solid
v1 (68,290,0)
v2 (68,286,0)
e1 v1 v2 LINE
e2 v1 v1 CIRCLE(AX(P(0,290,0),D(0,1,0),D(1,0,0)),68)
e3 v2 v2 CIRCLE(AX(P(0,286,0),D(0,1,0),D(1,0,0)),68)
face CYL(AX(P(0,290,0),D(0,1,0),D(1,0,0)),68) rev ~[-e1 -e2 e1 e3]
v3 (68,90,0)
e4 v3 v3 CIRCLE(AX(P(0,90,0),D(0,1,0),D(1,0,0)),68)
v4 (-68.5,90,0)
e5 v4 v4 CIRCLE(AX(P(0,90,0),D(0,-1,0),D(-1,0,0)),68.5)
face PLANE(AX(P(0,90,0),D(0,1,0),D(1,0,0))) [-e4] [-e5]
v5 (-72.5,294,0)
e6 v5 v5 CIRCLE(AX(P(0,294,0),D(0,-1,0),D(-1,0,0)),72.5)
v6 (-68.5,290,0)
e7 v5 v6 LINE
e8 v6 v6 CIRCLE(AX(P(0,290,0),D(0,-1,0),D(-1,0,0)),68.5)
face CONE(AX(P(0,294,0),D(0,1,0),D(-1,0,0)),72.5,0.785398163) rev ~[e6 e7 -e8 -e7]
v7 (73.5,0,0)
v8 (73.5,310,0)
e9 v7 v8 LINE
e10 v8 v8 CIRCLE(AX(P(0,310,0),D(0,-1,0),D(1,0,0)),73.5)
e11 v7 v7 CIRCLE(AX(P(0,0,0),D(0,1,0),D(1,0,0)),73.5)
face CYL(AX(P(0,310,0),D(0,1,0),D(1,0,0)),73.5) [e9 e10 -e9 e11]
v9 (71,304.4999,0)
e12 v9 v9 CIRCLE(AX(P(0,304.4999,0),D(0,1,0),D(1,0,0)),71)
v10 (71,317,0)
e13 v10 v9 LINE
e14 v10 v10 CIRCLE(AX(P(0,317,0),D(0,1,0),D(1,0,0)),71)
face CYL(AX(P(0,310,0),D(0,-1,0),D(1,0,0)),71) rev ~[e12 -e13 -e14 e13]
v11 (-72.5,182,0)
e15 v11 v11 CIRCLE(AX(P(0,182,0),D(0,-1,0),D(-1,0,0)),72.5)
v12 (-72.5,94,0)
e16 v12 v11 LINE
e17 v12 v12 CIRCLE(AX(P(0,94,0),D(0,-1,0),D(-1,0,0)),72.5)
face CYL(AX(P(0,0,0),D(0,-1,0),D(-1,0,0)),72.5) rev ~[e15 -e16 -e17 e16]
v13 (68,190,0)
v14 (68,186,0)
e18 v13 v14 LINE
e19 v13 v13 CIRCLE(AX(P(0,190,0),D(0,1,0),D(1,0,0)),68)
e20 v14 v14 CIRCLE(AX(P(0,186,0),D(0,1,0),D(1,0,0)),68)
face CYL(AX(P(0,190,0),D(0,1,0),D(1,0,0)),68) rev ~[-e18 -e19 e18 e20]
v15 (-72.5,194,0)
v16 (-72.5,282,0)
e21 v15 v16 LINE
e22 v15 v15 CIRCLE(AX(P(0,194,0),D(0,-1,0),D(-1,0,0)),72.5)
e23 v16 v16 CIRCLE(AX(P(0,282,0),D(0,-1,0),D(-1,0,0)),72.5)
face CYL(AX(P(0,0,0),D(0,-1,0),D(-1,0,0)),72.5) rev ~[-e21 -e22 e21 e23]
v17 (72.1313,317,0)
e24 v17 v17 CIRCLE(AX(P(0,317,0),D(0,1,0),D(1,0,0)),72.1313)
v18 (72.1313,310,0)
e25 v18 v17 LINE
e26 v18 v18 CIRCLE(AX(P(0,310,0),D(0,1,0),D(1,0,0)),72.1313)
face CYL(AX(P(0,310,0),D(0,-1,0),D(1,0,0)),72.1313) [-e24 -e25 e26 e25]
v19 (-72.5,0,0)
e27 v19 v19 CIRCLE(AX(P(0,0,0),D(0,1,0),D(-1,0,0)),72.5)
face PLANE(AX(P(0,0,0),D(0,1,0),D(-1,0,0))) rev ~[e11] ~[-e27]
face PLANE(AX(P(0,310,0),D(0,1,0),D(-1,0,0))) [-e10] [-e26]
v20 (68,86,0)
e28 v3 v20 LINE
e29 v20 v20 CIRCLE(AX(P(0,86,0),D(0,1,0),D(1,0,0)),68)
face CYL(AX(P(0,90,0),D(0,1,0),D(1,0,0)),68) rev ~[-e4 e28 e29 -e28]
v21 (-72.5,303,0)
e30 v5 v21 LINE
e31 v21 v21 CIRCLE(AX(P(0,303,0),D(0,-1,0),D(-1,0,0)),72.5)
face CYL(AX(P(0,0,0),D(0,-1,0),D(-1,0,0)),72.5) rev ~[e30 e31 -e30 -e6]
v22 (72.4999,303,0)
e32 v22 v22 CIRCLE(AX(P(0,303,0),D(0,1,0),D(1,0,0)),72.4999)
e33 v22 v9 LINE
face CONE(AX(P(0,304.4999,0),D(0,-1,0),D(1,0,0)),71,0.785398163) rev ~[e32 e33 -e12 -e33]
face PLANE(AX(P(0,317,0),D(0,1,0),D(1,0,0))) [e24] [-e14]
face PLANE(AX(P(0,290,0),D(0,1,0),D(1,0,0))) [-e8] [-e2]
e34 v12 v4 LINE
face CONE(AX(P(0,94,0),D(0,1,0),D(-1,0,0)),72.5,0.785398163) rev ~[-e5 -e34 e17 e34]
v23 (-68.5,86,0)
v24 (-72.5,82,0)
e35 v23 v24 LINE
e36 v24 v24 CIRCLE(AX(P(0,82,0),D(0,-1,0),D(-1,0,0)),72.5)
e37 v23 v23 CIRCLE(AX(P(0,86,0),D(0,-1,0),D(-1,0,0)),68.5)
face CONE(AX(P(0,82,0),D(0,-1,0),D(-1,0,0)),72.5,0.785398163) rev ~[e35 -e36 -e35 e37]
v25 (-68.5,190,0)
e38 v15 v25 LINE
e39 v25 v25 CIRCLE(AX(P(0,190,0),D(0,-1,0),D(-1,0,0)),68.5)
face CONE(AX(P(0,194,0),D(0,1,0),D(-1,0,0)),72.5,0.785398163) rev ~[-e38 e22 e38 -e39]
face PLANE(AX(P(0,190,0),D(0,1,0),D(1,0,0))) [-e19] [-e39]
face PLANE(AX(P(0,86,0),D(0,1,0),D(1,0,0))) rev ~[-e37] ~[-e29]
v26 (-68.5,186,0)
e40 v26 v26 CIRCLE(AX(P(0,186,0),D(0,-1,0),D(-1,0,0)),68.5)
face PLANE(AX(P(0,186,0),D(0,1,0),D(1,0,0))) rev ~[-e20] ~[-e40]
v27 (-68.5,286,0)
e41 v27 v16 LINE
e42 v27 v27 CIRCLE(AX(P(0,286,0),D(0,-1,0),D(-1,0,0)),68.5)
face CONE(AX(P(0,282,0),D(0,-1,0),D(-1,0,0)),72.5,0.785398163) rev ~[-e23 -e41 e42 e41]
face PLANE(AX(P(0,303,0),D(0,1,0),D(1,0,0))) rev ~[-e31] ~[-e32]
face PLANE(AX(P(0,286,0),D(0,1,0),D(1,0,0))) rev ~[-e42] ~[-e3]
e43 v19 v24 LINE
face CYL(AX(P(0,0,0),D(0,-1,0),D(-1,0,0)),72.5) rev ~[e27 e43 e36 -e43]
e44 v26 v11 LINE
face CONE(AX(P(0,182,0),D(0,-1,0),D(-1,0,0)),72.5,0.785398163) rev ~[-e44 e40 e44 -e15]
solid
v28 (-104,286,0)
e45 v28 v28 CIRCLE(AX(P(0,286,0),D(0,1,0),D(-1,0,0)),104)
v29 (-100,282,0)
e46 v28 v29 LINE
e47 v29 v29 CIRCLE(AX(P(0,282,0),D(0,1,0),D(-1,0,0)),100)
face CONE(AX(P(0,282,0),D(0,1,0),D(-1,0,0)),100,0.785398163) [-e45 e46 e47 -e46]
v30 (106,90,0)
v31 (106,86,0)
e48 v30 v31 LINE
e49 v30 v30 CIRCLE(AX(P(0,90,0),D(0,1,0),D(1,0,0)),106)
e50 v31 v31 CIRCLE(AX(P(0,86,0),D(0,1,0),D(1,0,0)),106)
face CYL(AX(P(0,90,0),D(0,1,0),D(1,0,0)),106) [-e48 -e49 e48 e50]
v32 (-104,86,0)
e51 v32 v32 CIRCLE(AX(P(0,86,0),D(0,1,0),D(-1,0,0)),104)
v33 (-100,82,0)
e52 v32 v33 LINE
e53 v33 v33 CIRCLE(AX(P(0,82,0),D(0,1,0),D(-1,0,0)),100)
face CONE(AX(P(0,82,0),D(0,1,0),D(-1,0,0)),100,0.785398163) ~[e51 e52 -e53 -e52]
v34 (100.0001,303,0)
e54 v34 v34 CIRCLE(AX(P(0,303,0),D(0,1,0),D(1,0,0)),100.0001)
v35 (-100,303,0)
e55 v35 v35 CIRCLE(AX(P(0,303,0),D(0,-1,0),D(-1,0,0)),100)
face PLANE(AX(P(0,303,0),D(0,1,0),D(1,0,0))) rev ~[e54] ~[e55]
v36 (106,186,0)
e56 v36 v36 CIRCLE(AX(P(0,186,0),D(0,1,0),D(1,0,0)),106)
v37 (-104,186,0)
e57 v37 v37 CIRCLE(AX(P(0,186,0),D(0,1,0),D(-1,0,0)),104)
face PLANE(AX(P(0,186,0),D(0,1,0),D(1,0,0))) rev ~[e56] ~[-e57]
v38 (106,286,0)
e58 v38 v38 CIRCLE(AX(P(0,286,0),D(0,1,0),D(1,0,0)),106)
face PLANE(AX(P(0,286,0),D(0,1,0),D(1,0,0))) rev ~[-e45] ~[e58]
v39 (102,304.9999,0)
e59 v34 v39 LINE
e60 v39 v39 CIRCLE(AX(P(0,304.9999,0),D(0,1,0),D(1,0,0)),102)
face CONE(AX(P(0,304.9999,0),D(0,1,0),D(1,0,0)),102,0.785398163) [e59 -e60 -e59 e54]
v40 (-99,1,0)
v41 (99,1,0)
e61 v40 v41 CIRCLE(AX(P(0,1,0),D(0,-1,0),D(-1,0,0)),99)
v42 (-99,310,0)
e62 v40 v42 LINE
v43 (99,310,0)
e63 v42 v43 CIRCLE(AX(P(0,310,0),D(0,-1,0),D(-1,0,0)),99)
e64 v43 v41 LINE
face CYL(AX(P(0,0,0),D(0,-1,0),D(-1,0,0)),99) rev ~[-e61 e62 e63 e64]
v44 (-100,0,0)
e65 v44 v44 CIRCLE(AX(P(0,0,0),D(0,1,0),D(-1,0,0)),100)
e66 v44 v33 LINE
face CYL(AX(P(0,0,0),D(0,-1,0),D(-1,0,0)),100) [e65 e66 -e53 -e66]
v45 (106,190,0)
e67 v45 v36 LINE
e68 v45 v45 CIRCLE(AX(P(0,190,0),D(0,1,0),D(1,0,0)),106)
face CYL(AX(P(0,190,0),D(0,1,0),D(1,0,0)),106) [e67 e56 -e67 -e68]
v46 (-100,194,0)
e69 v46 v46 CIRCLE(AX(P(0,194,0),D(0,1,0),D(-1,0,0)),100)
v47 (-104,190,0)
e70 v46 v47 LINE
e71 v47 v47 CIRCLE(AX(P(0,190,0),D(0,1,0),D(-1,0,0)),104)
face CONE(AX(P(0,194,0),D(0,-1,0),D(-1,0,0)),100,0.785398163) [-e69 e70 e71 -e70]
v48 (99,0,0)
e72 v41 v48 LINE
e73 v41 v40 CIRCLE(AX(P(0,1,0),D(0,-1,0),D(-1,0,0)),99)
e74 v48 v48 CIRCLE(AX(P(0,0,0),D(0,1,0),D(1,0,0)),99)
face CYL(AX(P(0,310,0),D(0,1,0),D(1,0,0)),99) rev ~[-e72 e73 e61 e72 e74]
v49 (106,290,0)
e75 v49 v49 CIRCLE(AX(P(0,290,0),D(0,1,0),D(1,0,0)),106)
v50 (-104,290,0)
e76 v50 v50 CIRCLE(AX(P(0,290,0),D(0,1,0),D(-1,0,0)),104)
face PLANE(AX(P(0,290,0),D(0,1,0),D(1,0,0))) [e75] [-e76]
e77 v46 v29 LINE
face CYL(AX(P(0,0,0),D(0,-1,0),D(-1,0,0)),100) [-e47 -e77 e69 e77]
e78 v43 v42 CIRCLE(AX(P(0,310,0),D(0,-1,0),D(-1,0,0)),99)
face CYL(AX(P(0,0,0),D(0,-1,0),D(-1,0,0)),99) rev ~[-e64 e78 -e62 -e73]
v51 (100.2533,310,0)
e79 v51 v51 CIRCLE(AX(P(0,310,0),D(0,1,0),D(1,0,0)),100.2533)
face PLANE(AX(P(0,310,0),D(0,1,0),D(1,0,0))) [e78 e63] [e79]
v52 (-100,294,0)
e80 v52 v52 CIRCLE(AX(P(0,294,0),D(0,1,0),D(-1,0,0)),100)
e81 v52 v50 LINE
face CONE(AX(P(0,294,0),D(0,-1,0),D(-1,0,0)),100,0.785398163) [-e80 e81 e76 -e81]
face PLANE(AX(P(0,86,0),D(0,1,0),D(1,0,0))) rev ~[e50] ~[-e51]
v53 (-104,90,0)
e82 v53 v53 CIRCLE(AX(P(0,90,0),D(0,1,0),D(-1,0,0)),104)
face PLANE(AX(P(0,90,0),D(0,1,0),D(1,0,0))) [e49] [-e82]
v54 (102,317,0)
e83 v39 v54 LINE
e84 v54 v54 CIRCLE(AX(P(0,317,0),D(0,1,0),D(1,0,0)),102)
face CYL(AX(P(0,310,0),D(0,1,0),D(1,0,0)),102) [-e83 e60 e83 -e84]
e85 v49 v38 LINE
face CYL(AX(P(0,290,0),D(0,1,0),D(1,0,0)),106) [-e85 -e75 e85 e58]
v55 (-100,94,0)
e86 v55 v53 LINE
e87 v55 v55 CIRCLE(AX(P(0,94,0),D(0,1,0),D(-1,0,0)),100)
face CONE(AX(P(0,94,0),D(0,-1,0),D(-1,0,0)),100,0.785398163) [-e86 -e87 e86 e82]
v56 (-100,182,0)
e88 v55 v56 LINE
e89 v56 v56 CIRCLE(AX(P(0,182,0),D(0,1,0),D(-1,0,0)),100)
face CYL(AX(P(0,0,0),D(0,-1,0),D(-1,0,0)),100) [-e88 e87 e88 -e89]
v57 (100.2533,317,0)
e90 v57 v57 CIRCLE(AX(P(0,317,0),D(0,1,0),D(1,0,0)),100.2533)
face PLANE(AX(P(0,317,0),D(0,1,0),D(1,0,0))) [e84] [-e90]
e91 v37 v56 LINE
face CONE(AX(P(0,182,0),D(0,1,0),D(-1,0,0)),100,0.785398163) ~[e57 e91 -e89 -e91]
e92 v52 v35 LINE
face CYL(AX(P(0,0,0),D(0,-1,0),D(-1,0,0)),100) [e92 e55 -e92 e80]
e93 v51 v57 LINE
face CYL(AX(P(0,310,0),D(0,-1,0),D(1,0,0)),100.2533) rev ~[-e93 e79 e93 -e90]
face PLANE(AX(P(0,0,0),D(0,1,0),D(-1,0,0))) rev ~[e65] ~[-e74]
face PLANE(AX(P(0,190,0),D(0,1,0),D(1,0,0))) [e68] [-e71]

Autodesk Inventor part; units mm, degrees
ref_plane "YZ Plane" through (0, 0, 0) normal (1, 0, 0) x (0, 1, 0)
ref_plane "XZ Plane" through (0, 0, 0) normal (0, 1, 0) x (-1, 0, 0)
ref_plane "XY Plane" through (0, 0, 0) normal (0, 0, 1) x (1, 0, 0)
sketch "Sketch1" plane through (0, 0, 0) normal (0, 1, 0) x (-1, 0, 0)
  circle A0 centre (0, 0) radius 72.5
  circle A1 centre (0, 0) radius 100
  circle A2 centre (0, -86) radius 2
  circle A3 centre (14.9337, -84.6935) radius 2
  circle A4 centre (29.4137, -80.8136) radius 2
  circle A5 centre (43, -74.4782) radius 2
  circle A6 centre (55.2797, -65.8798) radius 2
  circle A7 centre (65.8798, -55.2797) radius 2
  circle A8 centre (74.4782, -43) radius 2
  circle A9 centre (80.8136, -29.4137) radius 2
  circle A10 centre (84.6935, -14.9337) radius 2
  circle A11 centre (86, 0) radius 2
  circle A12 centre (84.6935, 14.9337) radius 2
  circle A13 centre (80.8136, 29.4137) radius 2
  circle A14 centre (74.4782, 43) radius 2
  circle A15 centre (65.8798, 55.2797) radius 2
  circle A16 centre (55.2797, 65.8798) radius 2
  circle A17 centre (43, 74.4782) radius 2
  circle A18 centre (29.4137, 80.8136) radius 2
  circle A19 centre (14.9337, 84.6935) radius 2
  circle A20 centre (0, 86) radius 2
  circle A21 centre (-14.9337, 84.6935) radius 2
  circle A22 centre (-29.4137, 80.8136) radius 2
  circle A23 centre (-43, 74.4782) radius 2
  circle A24 centre (-55.2797, 65.8798) radius 2
  circle A25 centre (-65.8798, 55.2797) radius 2
  circle A26 centre (-74.4782, 43) radius 2
  circle A27 centre (-80.8136, 29.4137) radius 2
  circle A28 centre (-84.6935, 14.9337) radius 2
  circle A29 centre (-86, 0) radius 2
  circle A30 centre (-84.6935, -14.9337) radius 2
  circle A31 centre (-80.8136, -29.4137) radius 2
  circle A32 centre (-74.4782, -43) radius 2
  circle A33 centre (-65.8798, -55.2797) radius 2
  circle A34 centre (-55.2797, -65.8798) radius 2
  circle A35 centre (-43, -74.4782) radius 2
  circle A36 centre (-29.4137, -80.8136) radius 2
  circle A37 centre (-14.9337, -84.6935) radius 2
  dimension "d0" = 145
  dimension "d1" = 200
  dimension "d7" = 360
extrude "Extrusion1" add sketch "Sketch1" along normal blind 310
shell "Shell1" thickness 1 removed faces 1 at (-11.5508, 310, -94.9198)
sketch "Sketch2" plane through (0, 0, 0) normal (0, -1, 0) x (1, 0, 0)
  circle A0 centre (0, 0) radius 72.5
  circle A1 centre (0, 0) radius 71.8694
  circle A2 centre (0, 0) radius 74.247
  circle A3 centre (0, 0) radius 98.333
  circle A4 centre (0, 0) radius 100.5055
sketch "Sketch4" plane through (0, 310, 0) normal (0, 1, 0) x (1, 0, 0)
  circle A0 centre (0, 0) radius 73.5
  circle A1 centre (0, 0) radius 99
  dimension "d11" = 147
  dimension "d12" = 198
extrude "Extrusion2" cut sketch "Sketch4" against normal blind 320
sketch "Sketch5" plane through (0, 310, 0) normal (0, 1, 0) x (1, 0, 0)
  circle A0 centre (0, 0) radius 72.1313
  circle A1 centre (0, 0) radius 71
  circle A2 centre (0, 0) radius 102
  circle A3 centre (0, 0) radius 100.2533
extrude "Extrusion3" add sketch "Sketch5" along normal mid plane 14
sketch "Sketch6" plane through (0, 310, 0) normal (0, 1, 0) x (1, 0, 0)
  circle A0 centre (0, 0) radius 73
  circle A1 centre (0, 0) radius 71.4438
  circle A2 centre (0, 0) radius 99.5789
  circle A3 centre (0, 0) radius 101
extrude "Extrusion4" add sketch "Sketch6" against normal blind 7
chamfer "Chamfer1" distance 1.5 angle 45 1 edges at (-71, 303, 0)
chamfer "Chamfer2" distance 2 angle 45 1 edges at (-102, 303, 0)
ref_plane "Work Plane1" through (0, 290, 0) normal (0, 1, 0) x (1, 0, 0)
sketch "Sketch7" plane through (0, 290, 0) normal (0, 1, 0) x (1, 0, 0)
  circle A0 centre (0, 0) radius 72.5
  circle A1 centre (0, 0) radius 68
  circle A2 centre (0, 0) radius 106
  circle A3 centre (0, 0) radius 100
extrude "Extrusion5" add sketch "Sketch7" against normal blind 4
chamfer "Chamfer3" distance 4 angle 45 4 edges at (72.5, 290, 0) (100, 290, 0) (100, 286, 0) (72.5, 286, 0)
pattern_linear "Rectangular Pattern1" count 3 spacing 100 along (0, -1, 0) of "Extrusion5", "Chamfer3"
properties part number "PechFormaTube"
